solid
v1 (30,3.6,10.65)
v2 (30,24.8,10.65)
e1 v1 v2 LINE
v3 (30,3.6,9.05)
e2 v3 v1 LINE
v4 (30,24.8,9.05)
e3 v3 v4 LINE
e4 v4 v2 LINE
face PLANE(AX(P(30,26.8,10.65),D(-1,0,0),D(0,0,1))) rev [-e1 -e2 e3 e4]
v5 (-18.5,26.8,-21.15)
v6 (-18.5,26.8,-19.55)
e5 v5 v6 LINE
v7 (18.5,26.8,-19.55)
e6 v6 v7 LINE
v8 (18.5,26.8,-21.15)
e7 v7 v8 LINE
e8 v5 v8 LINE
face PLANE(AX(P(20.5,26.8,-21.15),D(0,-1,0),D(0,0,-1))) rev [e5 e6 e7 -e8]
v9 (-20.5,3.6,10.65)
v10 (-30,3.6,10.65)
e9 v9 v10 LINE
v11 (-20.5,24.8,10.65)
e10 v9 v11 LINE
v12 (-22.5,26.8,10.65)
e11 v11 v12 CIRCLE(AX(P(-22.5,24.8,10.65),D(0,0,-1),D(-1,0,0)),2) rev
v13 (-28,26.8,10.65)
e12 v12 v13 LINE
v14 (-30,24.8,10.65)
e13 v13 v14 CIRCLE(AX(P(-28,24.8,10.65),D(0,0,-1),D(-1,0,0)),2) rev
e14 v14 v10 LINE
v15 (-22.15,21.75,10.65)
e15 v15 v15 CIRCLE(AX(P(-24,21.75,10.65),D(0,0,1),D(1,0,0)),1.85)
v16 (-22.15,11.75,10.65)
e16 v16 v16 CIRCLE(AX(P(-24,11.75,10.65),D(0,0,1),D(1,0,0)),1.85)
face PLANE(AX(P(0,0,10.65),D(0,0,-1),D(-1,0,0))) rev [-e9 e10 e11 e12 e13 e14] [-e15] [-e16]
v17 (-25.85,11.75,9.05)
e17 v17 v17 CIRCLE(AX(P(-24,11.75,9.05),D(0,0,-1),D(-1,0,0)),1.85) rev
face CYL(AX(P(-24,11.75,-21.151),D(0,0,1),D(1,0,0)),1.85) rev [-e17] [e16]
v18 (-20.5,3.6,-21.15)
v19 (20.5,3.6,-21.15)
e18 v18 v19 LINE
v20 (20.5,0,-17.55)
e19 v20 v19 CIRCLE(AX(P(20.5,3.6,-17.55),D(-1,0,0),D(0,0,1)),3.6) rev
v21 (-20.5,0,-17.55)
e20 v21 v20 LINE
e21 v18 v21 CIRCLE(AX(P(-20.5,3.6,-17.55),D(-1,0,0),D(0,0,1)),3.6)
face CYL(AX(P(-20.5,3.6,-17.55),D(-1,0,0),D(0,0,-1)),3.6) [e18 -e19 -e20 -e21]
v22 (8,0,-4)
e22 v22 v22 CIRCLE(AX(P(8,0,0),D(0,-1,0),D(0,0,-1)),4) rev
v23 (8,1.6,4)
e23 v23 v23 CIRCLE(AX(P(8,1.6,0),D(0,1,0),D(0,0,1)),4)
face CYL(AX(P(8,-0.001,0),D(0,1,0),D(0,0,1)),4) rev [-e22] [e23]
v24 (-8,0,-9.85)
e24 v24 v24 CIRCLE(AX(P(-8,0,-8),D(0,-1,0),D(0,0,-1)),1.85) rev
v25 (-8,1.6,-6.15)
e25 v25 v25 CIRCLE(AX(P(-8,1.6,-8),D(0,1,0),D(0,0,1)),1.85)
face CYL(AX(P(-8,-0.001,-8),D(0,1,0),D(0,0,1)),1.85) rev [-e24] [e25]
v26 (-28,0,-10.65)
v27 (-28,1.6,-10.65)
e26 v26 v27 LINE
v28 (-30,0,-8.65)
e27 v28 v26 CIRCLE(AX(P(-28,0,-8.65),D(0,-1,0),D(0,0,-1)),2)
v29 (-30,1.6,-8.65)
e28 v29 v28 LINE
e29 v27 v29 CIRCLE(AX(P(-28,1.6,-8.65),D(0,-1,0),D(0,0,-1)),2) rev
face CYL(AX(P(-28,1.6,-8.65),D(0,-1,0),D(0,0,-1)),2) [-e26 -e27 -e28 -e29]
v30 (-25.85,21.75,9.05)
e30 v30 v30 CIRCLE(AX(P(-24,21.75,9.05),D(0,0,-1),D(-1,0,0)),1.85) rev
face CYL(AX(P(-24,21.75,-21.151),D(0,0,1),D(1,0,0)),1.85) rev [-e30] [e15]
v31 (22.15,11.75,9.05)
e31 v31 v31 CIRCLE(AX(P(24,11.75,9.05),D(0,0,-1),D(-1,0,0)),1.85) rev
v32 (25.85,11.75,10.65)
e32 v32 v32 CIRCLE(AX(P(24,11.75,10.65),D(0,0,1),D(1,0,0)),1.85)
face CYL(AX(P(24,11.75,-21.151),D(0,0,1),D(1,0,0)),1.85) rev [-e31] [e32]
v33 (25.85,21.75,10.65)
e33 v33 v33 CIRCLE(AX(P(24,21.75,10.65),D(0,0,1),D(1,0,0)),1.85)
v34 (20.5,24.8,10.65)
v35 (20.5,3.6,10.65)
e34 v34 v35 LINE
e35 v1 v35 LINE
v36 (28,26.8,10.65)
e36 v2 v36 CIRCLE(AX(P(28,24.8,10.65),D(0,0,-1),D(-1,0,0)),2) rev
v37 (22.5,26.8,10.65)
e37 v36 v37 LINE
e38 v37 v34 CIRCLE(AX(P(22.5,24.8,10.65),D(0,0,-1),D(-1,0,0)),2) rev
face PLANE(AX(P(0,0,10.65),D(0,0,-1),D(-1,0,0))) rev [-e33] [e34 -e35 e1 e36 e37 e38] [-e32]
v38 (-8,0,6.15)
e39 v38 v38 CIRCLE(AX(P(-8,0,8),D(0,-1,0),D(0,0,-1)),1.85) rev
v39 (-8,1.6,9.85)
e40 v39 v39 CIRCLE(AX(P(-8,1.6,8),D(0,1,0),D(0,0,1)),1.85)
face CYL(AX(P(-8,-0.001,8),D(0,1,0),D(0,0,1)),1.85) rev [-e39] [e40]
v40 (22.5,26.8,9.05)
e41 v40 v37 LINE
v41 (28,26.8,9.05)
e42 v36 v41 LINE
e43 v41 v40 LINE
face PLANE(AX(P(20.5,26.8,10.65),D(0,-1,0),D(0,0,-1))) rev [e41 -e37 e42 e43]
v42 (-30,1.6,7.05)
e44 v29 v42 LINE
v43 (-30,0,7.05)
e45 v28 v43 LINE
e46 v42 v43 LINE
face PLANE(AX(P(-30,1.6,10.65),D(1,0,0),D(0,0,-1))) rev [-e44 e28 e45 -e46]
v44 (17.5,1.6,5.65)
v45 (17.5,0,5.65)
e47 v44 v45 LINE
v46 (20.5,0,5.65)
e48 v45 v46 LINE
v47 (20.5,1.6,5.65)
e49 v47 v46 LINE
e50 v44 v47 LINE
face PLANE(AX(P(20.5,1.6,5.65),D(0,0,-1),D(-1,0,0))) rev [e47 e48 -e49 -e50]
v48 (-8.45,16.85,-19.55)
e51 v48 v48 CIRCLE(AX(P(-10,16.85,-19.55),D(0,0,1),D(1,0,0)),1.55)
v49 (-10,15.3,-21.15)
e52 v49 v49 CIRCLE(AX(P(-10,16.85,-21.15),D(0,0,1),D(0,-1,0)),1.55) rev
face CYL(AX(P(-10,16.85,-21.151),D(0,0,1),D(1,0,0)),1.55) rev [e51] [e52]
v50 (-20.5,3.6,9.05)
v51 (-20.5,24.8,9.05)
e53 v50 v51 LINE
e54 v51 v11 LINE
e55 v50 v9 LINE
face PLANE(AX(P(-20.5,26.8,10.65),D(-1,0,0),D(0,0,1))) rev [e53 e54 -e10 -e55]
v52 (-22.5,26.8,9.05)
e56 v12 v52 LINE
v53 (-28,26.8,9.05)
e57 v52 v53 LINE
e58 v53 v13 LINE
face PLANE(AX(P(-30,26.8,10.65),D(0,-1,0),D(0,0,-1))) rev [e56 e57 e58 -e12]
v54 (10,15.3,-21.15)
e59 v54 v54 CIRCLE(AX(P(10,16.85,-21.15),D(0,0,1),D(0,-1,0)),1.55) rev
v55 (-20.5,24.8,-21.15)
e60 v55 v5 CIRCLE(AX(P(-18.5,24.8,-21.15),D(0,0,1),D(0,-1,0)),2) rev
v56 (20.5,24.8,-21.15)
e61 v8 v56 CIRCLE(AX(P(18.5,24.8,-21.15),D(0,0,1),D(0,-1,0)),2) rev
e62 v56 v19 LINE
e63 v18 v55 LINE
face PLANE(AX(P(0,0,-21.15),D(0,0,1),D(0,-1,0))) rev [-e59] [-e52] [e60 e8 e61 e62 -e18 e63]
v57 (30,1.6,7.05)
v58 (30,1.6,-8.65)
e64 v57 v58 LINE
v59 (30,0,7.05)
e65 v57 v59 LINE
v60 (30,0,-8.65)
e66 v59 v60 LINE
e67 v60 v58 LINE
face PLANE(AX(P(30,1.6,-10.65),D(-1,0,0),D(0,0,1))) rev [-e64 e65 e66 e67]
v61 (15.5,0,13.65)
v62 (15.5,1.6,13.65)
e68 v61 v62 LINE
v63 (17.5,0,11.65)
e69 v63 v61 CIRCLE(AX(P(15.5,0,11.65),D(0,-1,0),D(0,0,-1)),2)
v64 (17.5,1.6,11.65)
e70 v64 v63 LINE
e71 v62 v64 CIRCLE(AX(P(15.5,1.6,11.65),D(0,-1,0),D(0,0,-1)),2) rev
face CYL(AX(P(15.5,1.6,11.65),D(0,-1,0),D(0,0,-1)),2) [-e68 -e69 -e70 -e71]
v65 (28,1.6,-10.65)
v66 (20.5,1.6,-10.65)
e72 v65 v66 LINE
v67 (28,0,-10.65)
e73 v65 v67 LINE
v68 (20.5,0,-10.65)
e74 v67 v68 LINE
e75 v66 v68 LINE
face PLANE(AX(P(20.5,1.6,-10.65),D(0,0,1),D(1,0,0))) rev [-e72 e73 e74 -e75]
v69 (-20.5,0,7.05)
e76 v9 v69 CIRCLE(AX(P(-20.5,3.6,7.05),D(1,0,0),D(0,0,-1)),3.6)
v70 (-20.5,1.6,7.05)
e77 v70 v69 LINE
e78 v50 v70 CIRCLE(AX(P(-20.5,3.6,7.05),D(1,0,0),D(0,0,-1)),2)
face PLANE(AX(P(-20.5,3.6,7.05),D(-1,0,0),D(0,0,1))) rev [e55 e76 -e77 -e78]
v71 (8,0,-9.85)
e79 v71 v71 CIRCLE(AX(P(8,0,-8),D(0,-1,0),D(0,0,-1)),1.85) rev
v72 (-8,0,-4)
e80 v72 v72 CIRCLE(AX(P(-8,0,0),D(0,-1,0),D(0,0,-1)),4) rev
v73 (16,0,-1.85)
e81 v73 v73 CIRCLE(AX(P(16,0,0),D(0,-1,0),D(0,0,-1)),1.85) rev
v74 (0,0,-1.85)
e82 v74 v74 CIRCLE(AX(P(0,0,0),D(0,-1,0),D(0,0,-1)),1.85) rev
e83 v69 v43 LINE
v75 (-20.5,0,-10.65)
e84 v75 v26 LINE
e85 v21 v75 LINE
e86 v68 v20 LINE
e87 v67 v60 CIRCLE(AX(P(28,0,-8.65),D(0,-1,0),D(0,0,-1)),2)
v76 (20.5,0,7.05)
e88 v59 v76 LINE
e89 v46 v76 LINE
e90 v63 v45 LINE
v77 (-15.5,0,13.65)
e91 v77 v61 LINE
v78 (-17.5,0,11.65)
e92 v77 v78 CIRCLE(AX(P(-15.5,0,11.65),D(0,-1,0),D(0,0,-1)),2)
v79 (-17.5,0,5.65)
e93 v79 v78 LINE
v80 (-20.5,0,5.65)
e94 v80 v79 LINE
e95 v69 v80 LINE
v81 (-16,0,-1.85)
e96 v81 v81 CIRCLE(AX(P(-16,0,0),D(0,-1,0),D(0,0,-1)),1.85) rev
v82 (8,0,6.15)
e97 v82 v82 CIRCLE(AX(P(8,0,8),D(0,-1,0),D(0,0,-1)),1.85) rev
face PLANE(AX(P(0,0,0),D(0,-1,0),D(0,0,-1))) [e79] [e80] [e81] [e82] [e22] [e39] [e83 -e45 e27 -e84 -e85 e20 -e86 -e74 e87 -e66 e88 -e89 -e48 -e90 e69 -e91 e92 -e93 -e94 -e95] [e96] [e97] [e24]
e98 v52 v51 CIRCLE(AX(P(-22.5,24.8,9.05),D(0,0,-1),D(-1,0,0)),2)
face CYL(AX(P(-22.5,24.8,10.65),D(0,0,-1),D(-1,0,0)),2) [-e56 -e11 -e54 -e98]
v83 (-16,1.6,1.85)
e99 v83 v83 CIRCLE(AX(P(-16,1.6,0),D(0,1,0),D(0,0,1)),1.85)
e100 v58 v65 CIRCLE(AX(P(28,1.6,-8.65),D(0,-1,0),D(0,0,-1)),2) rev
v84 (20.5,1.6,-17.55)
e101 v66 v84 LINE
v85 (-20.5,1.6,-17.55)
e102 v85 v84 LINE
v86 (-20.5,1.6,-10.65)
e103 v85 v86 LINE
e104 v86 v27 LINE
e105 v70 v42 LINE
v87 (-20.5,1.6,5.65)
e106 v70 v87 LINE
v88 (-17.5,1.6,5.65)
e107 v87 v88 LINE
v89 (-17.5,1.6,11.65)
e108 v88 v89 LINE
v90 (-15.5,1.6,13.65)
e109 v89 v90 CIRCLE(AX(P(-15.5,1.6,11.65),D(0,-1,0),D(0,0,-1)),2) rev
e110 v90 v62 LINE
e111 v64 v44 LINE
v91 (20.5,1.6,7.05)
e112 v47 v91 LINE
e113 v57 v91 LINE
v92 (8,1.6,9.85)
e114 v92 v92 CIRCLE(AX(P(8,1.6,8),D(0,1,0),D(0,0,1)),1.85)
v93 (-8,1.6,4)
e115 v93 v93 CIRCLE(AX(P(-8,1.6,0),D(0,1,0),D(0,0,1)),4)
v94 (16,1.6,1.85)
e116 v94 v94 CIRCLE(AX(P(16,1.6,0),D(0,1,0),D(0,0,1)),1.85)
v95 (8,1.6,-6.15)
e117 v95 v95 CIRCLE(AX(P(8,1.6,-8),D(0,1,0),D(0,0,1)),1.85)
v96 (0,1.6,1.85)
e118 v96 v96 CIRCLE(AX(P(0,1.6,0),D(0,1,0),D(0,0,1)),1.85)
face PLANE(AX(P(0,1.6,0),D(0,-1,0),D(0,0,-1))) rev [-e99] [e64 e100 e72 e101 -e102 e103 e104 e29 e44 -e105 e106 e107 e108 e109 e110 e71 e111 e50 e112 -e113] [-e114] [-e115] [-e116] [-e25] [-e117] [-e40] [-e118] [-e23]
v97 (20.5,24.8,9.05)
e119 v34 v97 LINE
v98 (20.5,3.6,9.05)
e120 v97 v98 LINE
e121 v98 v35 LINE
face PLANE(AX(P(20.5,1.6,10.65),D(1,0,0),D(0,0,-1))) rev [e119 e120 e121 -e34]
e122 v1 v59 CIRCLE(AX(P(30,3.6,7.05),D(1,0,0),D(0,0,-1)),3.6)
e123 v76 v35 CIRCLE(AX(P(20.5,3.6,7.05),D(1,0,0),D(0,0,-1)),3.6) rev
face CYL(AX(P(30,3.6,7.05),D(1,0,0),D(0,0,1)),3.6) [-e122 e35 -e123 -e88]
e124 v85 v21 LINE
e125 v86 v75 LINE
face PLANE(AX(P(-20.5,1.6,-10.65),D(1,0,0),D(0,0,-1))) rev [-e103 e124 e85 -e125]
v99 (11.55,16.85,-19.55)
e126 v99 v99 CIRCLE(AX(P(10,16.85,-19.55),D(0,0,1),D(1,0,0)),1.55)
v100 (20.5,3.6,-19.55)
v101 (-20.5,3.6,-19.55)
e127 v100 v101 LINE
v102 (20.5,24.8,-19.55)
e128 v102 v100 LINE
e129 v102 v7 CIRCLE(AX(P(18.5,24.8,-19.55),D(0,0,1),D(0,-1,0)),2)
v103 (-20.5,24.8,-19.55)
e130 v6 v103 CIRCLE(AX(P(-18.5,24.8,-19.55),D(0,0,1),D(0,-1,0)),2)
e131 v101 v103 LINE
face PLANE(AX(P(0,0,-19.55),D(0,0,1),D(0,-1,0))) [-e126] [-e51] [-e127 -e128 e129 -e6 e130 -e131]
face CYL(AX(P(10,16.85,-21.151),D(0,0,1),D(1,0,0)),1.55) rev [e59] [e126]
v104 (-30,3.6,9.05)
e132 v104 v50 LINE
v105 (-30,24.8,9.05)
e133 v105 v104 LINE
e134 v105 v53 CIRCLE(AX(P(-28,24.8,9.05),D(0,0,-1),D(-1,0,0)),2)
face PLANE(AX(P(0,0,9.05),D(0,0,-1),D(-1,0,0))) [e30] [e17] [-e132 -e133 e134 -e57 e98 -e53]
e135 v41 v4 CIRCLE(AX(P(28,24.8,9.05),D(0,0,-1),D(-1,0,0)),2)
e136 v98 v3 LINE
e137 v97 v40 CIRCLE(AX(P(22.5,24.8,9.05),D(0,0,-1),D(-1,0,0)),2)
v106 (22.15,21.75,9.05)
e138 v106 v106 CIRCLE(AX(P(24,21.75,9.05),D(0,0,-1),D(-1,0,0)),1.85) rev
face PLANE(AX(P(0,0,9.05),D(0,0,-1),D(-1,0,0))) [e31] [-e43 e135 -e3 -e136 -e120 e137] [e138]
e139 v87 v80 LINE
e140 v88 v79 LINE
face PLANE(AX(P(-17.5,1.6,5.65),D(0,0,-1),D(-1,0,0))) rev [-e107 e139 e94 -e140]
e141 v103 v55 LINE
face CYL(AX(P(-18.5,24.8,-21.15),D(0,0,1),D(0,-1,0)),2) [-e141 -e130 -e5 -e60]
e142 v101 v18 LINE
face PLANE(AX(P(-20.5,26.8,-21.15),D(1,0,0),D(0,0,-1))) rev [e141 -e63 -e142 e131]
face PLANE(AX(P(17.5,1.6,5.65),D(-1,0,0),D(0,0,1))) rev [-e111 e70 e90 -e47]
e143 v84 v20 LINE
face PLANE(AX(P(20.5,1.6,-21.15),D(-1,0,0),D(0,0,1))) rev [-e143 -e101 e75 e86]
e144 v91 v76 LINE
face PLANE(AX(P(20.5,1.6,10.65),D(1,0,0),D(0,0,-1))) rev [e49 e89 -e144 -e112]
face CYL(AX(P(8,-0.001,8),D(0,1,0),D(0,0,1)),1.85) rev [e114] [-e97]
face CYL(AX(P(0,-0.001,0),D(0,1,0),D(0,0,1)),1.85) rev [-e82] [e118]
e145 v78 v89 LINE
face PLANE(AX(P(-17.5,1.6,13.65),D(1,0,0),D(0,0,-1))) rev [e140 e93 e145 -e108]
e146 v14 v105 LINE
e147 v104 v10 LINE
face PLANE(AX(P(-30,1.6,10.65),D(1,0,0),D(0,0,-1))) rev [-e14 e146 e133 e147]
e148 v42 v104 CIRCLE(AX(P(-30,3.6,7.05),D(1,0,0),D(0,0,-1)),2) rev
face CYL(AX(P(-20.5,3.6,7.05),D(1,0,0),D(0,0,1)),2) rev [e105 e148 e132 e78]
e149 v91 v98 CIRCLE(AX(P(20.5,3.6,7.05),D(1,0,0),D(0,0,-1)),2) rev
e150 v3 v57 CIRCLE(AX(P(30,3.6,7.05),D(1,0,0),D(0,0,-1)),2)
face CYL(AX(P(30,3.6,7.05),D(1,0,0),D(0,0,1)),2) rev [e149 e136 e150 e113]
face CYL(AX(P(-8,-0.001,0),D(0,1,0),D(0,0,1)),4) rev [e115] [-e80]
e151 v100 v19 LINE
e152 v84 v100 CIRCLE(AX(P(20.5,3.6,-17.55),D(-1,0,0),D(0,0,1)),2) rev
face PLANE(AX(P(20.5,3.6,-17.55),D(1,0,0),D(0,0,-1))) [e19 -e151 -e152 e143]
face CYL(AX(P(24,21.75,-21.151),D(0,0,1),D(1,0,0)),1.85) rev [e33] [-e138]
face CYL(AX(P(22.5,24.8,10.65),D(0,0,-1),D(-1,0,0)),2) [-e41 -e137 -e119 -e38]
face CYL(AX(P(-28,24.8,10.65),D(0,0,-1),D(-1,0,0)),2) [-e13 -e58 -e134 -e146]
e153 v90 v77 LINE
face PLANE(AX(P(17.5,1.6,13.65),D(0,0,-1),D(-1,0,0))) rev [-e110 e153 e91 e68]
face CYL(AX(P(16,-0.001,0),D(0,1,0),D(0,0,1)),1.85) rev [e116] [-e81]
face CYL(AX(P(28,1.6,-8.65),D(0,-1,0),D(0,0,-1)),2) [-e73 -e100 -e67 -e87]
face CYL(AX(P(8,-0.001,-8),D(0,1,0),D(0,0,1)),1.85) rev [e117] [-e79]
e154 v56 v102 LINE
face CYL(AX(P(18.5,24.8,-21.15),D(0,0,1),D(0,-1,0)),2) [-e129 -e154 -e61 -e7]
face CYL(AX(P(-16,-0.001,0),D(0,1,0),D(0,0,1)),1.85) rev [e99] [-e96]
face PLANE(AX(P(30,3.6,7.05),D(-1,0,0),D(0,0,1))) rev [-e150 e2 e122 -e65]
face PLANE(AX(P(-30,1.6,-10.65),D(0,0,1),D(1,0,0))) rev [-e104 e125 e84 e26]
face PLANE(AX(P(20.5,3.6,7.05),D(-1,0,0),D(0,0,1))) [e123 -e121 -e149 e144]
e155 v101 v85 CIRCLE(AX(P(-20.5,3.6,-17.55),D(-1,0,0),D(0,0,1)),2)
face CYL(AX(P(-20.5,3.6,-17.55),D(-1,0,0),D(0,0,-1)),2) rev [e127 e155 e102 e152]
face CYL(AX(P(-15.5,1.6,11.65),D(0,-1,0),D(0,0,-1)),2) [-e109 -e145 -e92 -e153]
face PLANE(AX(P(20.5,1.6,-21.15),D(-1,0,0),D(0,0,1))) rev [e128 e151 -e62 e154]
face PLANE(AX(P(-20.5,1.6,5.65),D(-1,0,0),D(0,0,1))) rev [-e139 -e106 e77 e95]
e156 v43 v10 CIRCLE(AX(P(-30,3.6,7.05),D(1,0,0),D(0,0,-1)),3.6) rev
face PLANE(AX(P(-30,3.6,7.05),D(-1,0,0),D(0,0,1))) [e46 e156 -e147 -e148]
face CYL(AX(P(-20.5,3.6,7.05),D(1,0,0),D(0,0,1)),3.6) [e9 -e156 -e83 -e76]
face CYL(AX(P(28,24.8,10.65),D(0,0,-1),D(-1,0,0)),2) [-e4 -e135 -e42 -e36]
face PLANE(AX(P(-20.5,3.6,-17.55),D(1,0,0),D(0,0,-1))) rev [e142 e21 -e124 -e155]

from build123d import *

# Parameters (mm, degrees)
BASE_FLANGE1_DEPTH             = 1.6
EDGE_FLANGE1_STRIP_W           = 10.4
EDGE_FLANGE1_STRIP_H           = 1.6
EDGE_FLANGE1_STRIP_CUT_DEPTH   = 41
EDGE_FLANGE1_STRIP_2_W         = 10.4
EDGE_FLANGE1_STRIP_2_H         = 1.6
EDGE_FLANGE1_STRIP_CUT_2_DEPTH = 9.5
EDGE_FLANGE1_STRIP_3_W         = 10.4
EDGE_FLANGE1_STRIP_3_H         = 1.6
EDGE_FLANGE1_STRIP_CUT_3_DEPTH = 9.5
EDGE_FLANGE1_DEPTH             = 41
EDGE_FLANGE1_BEND_DEPTH        = 9.5
EDGE_FLANGE1_BEND_2_DEPTH      = 9.5
CUT_EXTRUDE1_REACH             = 46.524
SKETCH15_R                     = 1.85
SKETCH15_R_2                   = 4
CUT_EXTRUDE2_REACH             = 53.278
SKETCH16_R                     = 1.85
CUT_EXTRUDE3_REACH             = 54.158
SKETCH17_R                     = 1.55
FILLET1_R                      = 2


# Sheet-metal steps are written as plain solids
with BuildPart() as part:
    # Sketch1 → Base-Flange1 (new body)
    with BuildSketch(Plane(origin=(0, 0, 0), x_dir=(1, 0, 0), z_dir=(0, 1, 0))):
        Polygon((-20.5, 21.15), (20.5, 21.15), (20.5, 10.65), (30, 10.65), (30, -10.65), (20.5, -10.65), (20.5, -5.65), (17.5, -5.65), (17.5, -13.65), (-17.5, -13.65), (-17.5, -5.65), (-20.5, -5.65), (-20.5, -10.65), (-30, -10.65), (-30, 10.65), (-20.5, 10.65), align=None)
    extrude(amount=BASE_FLANGE1_DEPTH)

    # Edge-Flange1 strip (across the edge) → Edge-Flange1 strip cut (cut)
    with BuildSketch(Plane(origin=(20.5, 1.6, -21.15), x_dir=(0, 0, 1), z_dir=(-1, 0, 0))):
        with Locations((-1.6, -0.8)):
            Rectangle(EDGE_FLANGE1_STRIP_W, EDGE_FLANGE1_STRIP_H)
    extrude(amount=EDGE_FLANGE1_STRIP_CUT_DEPTH, mode=Mode.SUBTRACT)

    # Edge-Flange1 strip 2 (across the edge) → Edge-Flange1 strip cut 2 (cut)
    with BuildSketch(Plane(origin=(20.5, 1.6, 10.65), x_dir=(0, 0, -1), z_dir=(1, 0, 0))):
        with Locations((-1.6, -0.8)):
            Rectangle(EDGE_FLANGE1_STRIP_2_W, EDGE_FLANGE1_STRIP_2_H)
    extrude(amount=EDGE_FLANGE1_STRIP_CUT_2_DEPTH, mode=Mode.SUBTRACT)

    # Edge-Flange1 strip 3 (across the edge) → Edge-Flange1 strip cut 3 (cut)
    with BuildSketch(Plane(origin=(-30, 1.6, 10.65), x_dir=(0, 0, -1), z_dir=(1, 0, 0))):
        with Locations((-1.6, -0.8)):
            Rectangle(EDGE_FLANGE1_STRIP_3_W, EDGE_FLANGE1_STRIP_3_H)
    extrude(amount=EDGE_FLANGE1_STRIP_CUT_3_DEPTH, mode=Mode.SUBTRACT)

    # Edge-Flange1 section (across the edge) → Edge-Flange1 (add)
    with BuildSketch(Plane(origin=(20.5, 1.6, -21.15), x_dir=(0, 0, 1), z_dir=(-1, 0, 0))):
        with BuildLine():
            Line((0, 2), (0, 25.2))
            Line((0, 25.2), (1.6, 25.2))
            Line((1.6, 25.2), (1.6, 2))
            ThreePointArc((1.6, 2), (2.185786438, 0.585786438), (3.6, 0))
            Line((3.6, 0), (3.6, -1.6))
            ThreePointArc((3.6, -1.6), (1.054415588, -0.545584412), (0, 2))
        make_face()
    extrude(amount=EDGE_FLANGE1_DEPTH)

    # Edge-Flange1 section 2 (across the edge) → Edge-Flange1 bend (add)
    with BuildSketch(Plane(origin=(20.5, 1.6, 10.65), x_dir=(0, 0, -1), z_dir=(1, 0, 0))):
        with BuildLine():
            Line((0, 2), (0, 25.2))
            Line((0, 25.2), (1.6, 25.2))
            Line((1.6, 25.2), (1.6, 2))
            ThreePointArc((1.6, 2), (2.185786438, 0.585786438), (3.6, 0))
            Line((3.6, 0), (3.6, -1.6))
            ThreePointArc((3.6, -1.6), (1.054415588, -0.545584412), (0, 2))
        make_face()
    extrude(amount=EDGE_FLANGE1_BEND_DEPTH)

    # Edge-Flange1 section 3 (across the edge) → Edge-Flange1 bend 2 (add)
    with BuildSketch(Plane(origin=(-30, 1.6, 10.65), x_dir=(0, 0, -1), z_dir=(1, 0, 0))):
        with BuildLine():
            Line((0, 2), (0, 25.2))
            Line((0, 25.2), (1.6, 25.2))
            Line((1.6, 25.2), (1.6, 2))
            ThreePointArc((1.6, 2), (2.185786438, 0.585786438), (3.6, 0))
            Line((3.6, 0), (3.6, -1.6))
            ThreePointArc((3.6, -1.6), (1.054415588, -0.545584412), (0, 2))
        make_face()
    extrude(amount=EDGE_FLANGE1_BEND_2_DEPTH)

    # Sketch15 → Cut-Extrude1 (cut, up to next)
    with BuildSketch(Plane(origin=(0, 1.6, 0), x_dir=(1, 0, 0), z_dir=(0, 1, 0)), mode=Mode.PRIVATE) as cut_extrude1_sk1:
        with Locations(Location((0, 0, 0), (0, 0, 270))):
            Circle(SKETCH15_R)
    cut_extrude1_tool1 = extrude(cut_extrude1_sk1.sketch, amount=-CUT_EXTRUDE1_REACH, mode=Mode.PRIVATE) & part.part
    # Sketch15 → Cut-Extrude1 (cut, up to next)
    with BuildSketch(Plane(origin=(0, 1.6, 0), x_dir=(1, 0, 0), z_dir=(0, 1, 0)), mode=Mode.PRIVATE) as cut_extrude1_sk2:
        with Locations(Location((8, 0, 0), (0, 0, 270))):
            Circle(SKETCH15_R_2)
    cut_extrude1_tool2 = extrude(cut_extrude1_sk2.sketch, amount=-CUT_EXTRUDE1_REACH, mode=Mode.PRIVATE) & part.part
    # Sketch15 → Cut-Extrude1 (cut, up to next)
    with BuildSketch(Plane(origin=(0, 1.6, 0), x_dir=(1, 0, 0), z_dir=(0, 1, 0)), mode=Mode.PRIVATE) as cut_extrude1_sk3:
        with Locations(Location((-8, 0, 0), (0, 0, 270))):
            Circle(SKETCH15_R_2)
    cut_extrude1_tool3 = extrude(cut_extrude1_sk3.sketch, amount=-CUT_EXTRUDE1_REACH, mode=Mode.PRIVATE) & part.part
    # Sketch15 → Cut-Extrude1 (cut, up to next)
    with BuildSketch(Plane(origin=(0, 1.6, 0), x_dir=(1, 0, 0), z_dir=(0, 1, 0)), mode=Mode.PRIVATE) as cut_extrude1_sk4:
        with Locations(Location((16, 0, 0), (0, 0, 270))):
            Circle(SKETCH15_R)
    cut_extrude1_tool4 = extrude(cut_extrude1_sk4.sketch, amount=-CUT_EXTRUDE1_REACH, mode=Mode.PRIVATE) & part.part
    # Sketch15 → Cut-Extrude1 (cut, up to next)
    with BuildSketch(Plane(origin=(0, 1.6, 0), x_dir=(1, 0, 0), z_dir=(0, 1, 0)), mode=Mode.PRIVATE) as cut_extrude1_sk5:
        with Locations(Location((-16, 0, 0), (0, 0, 270))):
            Circle(SKETCH15_R)
    cut_extrude1_tool5 = extrude(cut_extrude1_sk5.sketch, amount=-CUT_EXTRUDE1_REACH, mode=Mode.PRIVATE) & part.part
    # Sketch15 → Cut-Extrude1 (cut, up to next)
    with BuildSketch(Plane(origin=(0, 1.6, 0), x_dir=(1, 0, 0), z_dir=(0, 1, 0)), mode=Mode.PRIVATE) as cut_extrude1_sk6:
        with Locations(Location((-8, 8, 0), (0, 0, 270))):
            Circle(SKETCH15_R)
    cut_extrude1_tool6 = extrude(cut_extrude1_sk6.sketch, amount=-CUT_EXTRUDE1_REACH, mode=Mode.PRIVATE) & part.part
    # Sketch15 → Cut-Extrude1 (cut, up to next)
    with BuildSketch(Plane(origin=(0, 1.6, 0), x_dir=(1, 0, 0), z_dir=(0, 1, 0)), mode=Mode.PRIVATE) as cut_extrude1_sk7:
        with Locations(Location((-8, -8, 0), (0, 0, 270))):
            Circle(SKETCH15_R)
    cut_extrude1_tool7 = extrude(cut_extrude1_sk7.sketch, amount=-CUT_EXTRUDE1_REACH, mode=Mode.PRIVATE) & part.part
    # Sketch15 → Cut-Extrude1 (cut, up to next)
    with BuildSketch(Plane(origin=(0, 1.6, 0), x_dir=(1, 0, 0), z_dir=(0, 1, 0)), mode=Mode.PRIVATE) as cut_extrude1_sk8:
        with Locations(Location((8, -8, 0), (0, 0, 270))):
            Circle(SKETCH15_R)
    cut_extrude1_tool8 = extrude(cut_extrude1_sk8.sketch, amount=-CUT_EXTRUDE1_REACH, mode=Mode.PRIVATE) & part.part
    # Sketch15 → Cut-Extrude1 (cut, up to next)
    with BuildSketch(Plane(origin=(0, 1.6, 0), x_dir=(1, 0, 0), z_dir=(0, 1, 0)), mode=Mode.PRIVATE) as cut_extrude1_sk9:
        with Locations(Location((8, 8, 0), (0, 0, 270))):
            Circle(SKETCH15_R)
    cut_extrude1_tool9 = extrude(cut_extrude1_sk9.sketch, amount=-CUT_EXTRUDE1_REACH, mode=Mode.PRIVATE) & part.part
    add(cut_extrude1_tool1.solids().sort_by_distance((0, 1.6, 0))[0], mode=Mode.SUBTRACT)
    add(cut_extrude1_tool2.solids().sort_by_distance((8, 1.6, 0))[0], mode=Mode.SUBTRACT)
    add(cut_extrude1_tool3.solids().sort_by_distance((-8, 1.6, 0))[0], mode=Mode.SUBTRACT)
    add(cut_extrude1_tool4.solids().sort_by_distance((16, 1.6, 0))[0], mode=Mode.SUBTRACT)
    add(cut_extrude1_tool5.solids().sort_by_distance((-16, 1.6, 0))[0], mode=Mode.SUBTRACT)
    add(cut_extrude1_tool6.solids().sort_by_distance((-8, 1.6, -8))[0], mode=Mode.SUBTRACT)
    add(cut_extrude1_tool7.solids().sort_by_distance((-8, 1.6, 8))[0], mode=Mode.SUBTRACT)
    add(cut_extrude1_tool8.solids().sort_by_distance((8, 1.6, 8))[0], mode=Mode.SUBTRACT)
    add(cut_extrude1_tool9.solids().sort_by_distance((8, 1.6, -8))[0], mode=Mode.SUBTRACT)

    # Sketch16 → Cut-Extrude2 (cut, up to next)
    with BuildSketch(Plane.XY.offset(10.65), mode=Mode.PRIVATE) as cut_extrude2_sk1:
        with Locations((-24, 21.75)):
            Circle(SKETCH16_R)
    cut_extrude2_tool1 = extrude(cut_extrude2_sk1.sketch, amount=-CUT_EXTRUDE2_REACH, mode=Mode.PRIVATE) & part.part
    # Sketch16 → Cut-Extrude2 (cut, up to next)
    with BuildSketch(Plane.XY.offset(10.65), mode=Mode.PRIVATE) as cut_extrude2_sk2:
        with Locations((-24, 11.75)):
            Circle(SKETCH16_R)
    cut_extrude2_tool2 = extrude(cut_extrude2_sk2.sketch, amount=-CUT_EXTRUDE2_REACH, mode=Mode.PRIVATE) & part.part
    # Sketch16 → Cut-Extrude2 (cut, up to next)
    with BuildSketch(Plane.XY.offset(10.65), mode=Mode.PRIVATE) as cut_extrude2_sk3:
        with Locations((24, 21.75)):
            Circle(SKETCH16_R)
    cut_extrude2_tool3 = extrude(cut_extrude2_sk3.sketch, amount=-CUT_EXTRUDE2_REACH, mode=Mode.PRIVATE) & part.part
    # Sketch16 → Cut-Extrude2 (cut, up to next)
    with BuildSketch(Plane.XY.offset(10.65), mode=Mode.PRIVATE) as cut_extrude2_sk4:
        with Locations((24, 11.75)):
            Circle(SKETCH16_R)
    cut_extrude2_tool4 = extrude(cut_extrude2_sk4.sketch, amount=-CUT_EXTRUDE2_REACH, mode=Mode.PRIVATE) & part.part
    add(cut_extrude2_tool1.solids().sort_by_distance((-24, 21.75, 10.65))[0], mode=Mode.SUBTRACT)
    add(cut_extrude2_tool2.solids().sort_by_distance((-24, 11.75, 10.65))[0], mode=Mode.SUBTRACT)
    add(cut_extrude2_tool3.solids().sort_by_distance((24, 21.75, 10.65))[0], mode=Mode.SUBTRACT)
    add(cut_extrude2_tool4.solids().sort_by_distance((24, 11.75, 10.65))[0], mode=Mode.SUBTRACT)

    # Sketch17 → Cut-Extrude3 (cut, up to next)
    with BuildSketch(Plane.XY.offset(-19.55), mode=Mode.PRIVATE) as cut_extrude3_sk1:
        with Locations((-10, 16.85)):
            Circle(SKETCH17_R)
    cut_extrude3_tool1 = extrude(cut_extrude3_sk1.sketch, amount=-CUT_EXTRUDE3_REACH, mode=Mode.PRIVATE) & part.part
    # Sketch17 → Cut-Extrude3 (cut, up to next)
    with BuildSketch(Plane.XY.offset(-19.55), mode=Mode.PRIVATE) as cut_extrude3_sk2:
        with Locations((10, 16.85)):
            Circle(SKETCH17_R)
    cut_extrude3_tool2 = extrude(cut_extrude3_sk2.sketch, amount=-CUT_EXTRUDE3_REACH, mode=Mode.PRIVATE) & part.part
    add(cut_extrude3_tool1.solids().sort_by_distance((-10, 16.85, -19.55))[0], mode=Mode.SUBTRACT)
    add(cut_extrude3_tool2.solids().sort_by_distance((10, 16.85, -19.55))[0], mode=Mode.SUBTRACT)

    # Fillet1
    fillet1_edges = [part.edges().sort_by_distance(p)[0] for p in [
        (20.5, 26.8, 9.85),
        (30, 26.8, 9.85),
        (-30, 26.8, 9.85),
        (-20.5, 26.8, 9.85),
        (30, 0.8, -10.65),
        (17.5, 0.8, 13.65),
        (-17.5, 0.8, 13.65),
        (-30, 0.8, -10.65),
        (20.5, 26.8, -20.35),
        (-20.5, 26.8, -20.35),
    ]]
    fillet(fillet1_edges, radius=FILLET1_R)


solid = part.part
